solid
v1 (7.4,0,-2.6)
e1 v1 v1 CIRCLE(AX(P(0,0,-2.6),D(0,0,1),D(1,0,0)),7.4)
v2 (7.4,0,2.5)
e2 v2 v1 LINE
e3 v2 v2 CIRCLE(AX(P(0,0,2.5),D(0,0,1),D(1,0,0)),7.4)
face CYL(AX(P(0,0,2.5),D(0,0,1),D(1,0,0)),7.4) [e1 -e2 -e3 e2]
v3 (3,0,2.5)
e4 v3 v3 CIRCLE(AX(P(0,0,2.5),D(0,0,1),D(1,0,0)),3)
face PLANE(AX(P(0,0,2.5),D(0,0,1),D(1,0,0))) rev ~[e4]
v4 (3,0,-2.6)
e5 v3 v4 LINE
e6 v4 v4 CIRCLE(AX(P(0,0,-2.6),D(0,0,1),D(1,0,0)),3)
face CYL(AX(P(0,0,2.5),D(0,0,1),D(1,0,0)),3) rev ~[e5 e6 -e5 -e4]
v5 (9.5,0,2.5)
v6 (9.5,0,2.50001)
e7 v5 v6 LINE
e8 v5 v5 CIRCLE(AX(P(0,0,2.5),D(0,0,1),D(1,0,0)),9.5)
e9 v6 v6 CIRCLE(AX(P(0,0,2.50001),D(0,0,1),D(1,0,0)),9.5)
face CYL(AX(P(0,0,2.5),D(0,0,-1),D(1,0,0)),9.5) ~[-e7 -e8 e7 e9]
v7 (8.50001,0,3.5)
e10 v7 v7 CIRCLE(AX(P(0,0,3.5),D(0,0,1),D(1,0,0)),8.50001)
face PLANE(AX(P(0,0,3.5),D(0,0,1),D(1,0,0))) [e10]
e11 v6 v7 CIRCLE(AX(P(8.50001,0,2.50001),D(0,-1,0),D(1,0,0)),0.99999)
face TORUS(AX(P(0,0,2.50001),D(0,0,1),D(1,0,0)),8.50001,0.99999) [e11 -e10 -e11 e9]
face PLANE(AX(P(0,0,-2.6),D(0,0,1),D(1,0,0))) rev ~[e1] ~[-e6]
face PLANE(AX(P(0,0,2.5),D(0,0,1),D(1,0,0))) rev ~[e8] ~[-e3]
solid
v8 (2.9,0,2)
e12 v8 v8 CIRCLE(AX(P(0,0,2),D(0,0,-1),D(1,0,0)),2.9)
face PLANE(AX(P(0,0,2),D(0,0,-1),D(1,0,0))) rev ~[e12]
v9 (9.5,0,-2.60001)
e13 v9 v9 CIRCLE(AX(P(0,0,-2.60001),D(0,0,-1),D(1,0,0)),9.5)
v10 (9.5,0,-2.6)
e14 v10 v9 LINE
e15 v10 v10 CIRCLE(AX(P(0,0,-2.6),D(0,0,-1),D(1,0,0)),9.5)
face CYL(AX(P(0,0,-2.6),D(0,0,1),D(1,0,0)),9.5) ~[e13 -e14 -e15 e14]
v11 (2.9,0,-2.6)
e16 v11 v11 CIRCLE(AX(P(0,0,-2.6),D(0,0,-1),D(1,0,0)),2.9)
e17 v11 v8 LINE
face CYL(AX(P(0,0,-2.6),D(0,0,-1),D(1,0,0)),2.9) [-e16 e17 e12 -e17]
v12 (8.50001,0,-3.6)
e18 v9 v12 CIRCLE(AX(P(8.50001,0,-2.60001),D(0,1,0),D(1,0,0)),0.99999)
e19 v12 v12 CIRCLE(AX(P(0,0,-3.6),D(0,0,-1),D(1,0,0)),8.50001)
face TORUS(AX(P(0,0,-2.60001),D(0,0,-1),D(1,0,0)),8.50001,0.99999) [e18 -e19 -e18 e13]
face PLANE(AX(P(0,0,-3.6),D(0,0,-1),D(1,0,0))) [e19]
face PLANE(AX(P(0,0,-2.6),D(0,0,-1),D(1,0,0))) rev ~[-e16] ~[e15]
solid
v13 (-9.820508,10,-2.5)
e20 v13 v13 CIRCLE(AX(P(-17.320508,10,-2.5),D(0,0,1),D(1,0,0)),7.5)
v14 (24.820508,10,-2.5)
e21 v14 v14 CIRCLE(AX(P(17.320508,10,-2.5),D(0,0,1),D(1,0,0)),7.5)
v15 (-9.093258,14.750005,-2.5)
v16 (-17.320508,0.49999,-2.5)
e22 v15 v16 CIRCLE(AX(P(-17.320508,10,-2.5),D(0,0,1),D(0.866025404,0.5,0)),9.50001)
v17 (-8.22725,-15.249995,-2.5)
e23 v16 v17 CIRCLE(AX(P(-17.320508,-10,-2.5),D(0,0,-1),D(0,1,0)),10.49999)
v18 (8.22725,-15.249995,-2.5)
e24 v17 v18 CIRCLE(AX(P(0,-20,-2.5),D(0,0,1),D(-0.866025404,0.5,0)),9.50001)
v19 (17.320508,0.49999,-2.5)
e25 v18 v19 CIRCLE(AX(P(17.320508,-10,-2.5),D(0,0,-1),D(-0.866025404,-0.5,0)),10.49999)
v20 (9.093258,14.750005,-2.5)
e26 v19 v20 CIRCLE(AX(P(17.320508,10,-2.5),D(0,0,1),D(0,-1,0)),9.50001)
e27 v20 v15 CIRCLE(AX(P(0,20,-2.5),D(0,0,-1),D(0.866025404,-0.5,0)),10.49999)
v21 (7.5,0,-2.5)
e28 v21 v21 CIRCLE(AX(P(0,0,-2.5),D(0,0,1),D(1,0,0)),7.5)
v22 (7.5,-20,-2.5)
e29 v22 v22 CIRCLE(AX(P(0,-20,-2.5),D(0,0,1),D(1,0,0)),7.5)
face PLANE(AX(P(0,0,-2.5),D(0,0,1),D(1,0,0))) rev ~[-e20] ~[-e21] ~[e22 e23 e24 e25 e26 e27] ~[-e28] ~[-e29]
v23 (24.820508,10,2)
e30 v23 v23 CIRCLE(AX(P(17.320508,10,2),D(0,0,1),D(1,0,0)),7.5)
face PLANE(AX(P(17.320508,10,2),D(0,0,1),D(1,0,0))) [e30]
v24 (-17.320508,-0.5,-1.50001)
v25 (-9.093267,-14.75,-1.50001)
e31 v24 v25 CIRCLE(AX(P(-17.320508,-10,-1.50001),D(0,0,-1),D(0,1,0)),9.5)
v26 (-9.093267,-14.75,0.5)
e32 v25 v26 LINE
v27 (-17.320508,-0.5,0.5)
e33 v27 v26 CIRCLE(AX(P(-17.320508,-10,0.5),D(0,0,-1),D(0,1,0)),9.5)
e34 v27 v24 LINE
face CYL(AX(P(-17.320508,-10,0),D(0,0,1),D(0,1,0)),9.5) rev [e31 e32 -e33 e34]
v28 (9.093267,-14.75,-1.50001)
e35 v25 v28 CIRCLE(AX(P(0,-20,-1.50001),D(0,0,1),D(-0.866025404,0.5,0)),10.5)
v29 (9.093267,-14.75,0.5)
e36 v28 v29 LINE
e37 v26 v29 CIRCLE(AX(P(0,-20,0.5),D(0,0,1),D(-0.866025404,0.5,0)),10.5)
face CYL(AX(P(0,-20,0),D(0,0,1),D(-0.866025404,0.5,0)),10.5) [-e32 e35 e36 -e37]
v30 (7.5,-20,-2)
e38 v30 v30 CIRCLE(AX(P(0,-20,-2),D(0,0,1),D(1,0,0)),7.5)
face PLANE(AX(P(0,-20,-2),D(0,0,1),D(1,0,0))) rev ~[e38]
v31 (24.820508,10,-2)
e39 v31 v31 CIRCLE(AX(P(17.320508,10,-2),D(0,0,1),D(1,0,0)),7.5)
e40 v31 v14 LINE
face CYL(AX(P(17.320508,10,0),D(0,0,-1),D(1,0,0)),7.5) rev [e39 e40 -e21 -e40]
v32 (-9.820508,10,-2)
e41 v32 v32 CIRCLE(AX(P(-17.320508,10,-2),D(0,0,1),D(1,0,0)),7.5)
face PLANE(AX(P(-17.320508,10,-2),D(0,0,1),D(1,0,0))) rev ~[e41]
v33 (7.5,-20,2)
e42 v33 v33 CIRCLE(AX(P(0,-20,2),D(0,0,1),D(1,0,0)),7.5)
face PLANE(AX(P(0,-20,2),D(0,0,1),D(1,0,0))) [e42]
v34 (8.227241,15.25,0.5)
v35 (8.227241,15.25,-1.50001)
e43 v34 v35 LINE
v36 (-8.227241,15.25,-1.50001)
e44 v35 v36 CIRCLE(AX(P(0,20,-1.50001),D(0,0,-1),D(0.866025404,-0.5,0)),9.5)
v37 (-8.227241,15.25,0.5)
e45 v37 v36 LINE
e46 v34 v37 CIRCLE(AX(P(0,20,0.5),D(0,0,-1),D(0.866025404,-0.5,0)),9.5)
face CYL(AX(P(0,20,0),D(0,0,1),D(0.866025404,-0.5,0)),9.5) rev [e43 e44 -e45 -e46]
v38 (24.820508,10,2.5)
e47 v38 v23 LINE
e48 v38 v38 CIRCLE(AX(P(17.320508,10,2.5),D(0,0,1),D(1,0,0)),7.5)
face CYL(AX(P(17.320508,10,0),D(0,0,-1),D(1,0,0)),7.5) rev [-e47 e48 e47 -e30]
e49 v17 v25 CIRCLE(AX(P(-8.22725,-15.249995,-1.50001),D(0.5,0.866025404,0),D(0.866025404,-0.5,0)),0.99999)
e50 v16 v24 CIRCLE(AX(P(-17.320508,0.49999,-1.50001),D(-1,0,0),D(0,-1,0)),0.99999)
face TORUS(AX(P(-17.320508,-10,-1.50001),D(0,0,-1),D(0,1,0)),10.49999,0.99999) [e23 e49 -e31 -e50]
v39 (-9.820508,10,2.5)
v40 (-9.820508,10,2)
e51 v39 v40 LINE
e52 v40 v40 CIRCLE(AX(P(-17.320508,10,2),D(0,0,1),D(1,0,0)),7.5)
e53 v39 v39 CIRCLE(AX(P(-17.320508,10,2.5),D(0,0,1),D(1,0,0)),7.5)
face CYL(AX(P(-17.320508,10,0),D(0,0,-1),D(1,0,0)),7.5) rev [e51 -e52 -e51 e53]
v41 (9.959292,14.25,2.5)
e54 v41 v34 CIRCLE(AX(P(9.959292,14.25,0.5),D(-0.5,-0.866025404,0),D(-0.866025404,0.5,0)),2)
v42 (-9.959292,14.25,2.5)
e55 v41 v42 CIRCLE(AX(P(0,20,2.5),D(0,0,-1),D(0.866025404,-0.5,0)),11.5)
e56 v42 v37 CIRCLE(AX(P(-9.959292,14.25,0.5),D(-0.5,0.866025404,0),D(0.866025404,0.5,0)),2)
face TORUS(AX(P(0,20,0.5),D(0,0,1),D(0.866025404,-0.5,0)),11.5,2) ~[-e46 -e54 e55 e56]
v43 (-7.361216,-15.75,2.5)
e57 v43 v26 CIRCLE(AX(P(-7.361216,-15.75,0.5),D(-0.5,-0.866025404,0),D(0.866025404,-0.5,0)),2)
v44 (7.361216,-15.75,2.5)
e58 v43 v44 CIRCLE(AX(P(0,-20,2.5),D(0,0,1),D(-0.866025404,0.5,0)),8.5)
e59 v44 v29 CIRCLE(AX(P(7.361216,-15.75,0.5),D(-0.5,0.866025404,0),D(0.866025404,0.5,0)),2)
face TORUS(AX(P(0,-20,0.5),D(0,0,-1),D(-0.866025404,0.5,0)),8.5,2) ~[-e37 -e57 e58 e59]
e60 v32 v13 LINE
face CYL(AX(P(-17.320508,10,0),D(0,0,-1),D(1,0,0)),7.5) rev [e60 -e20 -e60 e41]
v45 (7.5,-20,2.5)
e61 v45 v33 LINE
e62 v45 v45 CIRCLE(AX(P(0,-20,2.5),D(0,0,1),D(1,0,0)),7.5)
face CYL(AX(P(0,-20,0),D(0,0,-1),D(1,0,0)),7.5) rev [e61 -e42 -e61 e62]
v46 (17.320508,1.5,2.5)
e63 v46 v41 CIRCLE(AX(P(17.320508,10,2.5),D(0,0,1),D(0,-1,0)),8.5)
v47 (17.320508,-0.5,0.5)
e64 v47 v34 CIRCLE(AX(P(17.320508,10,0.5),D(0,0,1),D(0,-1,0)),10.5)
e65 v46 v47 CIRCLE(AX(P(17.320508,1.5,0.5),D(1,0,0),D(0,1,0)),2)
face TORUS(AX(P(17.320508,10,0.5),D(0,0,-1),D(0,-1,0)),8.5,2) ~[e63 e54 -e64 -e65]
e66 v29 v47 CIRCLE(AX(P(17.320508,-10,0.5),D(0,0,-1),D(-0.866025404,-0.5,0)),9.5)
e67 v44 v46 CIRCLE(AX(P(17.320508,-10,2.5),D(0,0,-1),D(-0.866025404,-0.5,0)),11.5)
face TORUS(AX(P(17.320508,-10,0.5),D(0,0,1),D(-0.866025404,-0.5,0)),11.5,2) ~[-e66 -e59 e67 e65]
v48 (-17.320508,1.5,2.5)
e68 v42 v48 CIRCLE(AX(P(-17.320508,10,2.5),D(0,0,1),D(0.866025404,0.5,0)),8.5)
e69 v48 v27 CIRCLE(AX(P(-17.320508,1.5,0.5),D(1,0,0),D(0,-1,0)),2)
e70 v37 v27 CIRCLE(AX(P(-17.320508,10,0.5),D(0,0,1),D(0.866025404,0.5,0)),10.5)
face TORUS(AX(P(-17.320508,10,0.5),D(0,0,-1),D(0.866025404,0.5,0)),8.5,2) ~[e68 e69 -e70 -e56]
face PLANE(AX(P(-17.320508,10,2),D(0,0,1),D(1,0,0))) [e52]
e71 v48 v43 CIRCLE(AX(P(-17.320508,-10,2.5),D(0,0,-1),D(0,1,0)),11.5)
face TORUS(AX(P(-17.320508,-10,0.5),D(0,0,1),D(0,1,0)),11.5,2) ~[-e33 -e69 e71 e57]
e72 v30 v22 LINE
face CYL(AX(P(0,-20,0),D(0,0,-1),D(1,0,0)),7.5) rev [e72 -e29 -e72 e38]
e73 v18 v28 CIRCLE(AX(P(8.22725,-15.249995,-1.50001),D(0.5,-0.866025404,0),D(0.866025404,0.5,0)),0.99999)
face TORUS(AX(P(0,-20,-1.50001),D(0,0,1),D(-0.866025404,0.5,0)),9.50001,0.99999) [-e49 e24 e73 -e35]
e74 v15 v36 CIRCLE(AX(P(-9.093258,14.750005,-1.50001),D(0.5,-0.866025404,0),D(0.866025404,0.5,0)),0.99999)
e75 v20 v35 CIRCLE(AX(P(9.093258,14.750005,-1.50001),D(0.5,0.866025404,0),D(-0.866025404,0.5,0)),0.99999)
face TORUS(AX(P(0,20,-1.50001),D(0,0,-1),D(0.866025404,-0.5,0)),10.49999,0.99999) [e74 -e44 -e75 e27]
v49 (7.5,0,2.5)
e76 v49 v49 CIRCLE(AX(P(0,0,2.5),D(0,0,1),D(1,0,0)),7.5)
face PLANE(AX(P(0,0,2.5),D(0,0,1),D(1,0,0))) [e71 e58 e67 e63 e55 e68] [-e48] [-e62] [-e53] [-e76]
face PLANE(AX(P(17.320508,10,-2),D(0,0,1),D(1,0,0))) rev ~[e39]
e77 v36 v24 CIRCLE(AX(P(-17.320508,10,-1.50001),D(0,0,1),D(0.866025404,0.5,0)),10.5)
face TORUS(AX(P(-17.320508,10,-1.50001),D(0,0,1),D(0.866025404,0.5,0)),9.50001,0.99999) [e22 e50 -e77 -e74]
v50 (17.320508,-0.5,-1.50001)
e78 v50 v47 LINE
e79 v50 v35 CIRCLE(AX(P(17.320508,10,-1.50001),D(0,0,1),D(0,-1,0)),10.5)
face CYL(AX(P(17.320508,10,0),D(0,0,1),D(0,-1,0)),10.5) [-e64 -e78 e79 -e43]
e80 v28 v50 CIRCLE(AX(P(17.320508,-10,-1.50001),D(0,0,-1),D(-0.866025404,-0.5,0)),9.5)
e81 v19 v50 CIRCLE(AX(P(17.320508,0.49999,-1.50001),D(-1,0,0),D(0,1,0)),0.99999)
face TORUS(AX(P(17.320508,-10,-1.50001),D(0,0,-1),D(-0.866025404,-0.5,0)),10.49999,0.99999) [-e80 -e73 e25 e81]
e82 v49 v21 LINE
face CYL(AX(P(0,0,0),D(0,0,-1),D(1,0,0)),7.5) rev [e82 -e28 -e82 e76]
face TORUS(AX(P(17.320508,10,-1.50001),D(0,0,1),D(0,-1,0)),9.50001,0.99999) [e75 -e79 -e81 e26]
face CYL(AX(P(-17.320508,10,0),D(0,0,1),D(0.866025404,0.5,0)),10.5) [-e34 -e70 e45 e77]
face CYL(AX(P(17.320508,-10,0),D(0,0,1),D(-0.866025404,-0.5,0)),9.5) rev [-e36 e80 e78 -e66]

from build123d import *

# Parameters (mm, degrees)
F0_R     = 7.5
F1_DEPTH = 2.5
F2_DEPTH = 2
F3_R     = 7.4
F3_R_2   = 3
F4_DEPTH = 5.1
F3_R_3   = 9.5
F5_DEPTH = 1
F6_R     = 2.9
F7_DEPTH = 4.6
F6_R_2   = 9.5
F6_R_3   = 7.4
F6_R_4   = 3
F8_DEPTH = 1
F9_R     = 2
F10_R    = 0.99999
F11_R    = 0.99999
F11_2_R  = 0.99999


# Not quite as in the source:
# - a fillet or chamfer is up to 0.001 mm smaller than in the source, because OpenCascade refuses the exact size


with BuildPart() as f1:
    # F0 (on Top) → F1 (new body, symmetric)
    with BuildSketch(Plane.XY):
        with BuildLine():
            ThreePointArc((-17.3205080757, -0.5), (-9.0932667397, -5.25), (-9.0932667397, -14.75))
            ThreePointArc((-9.0932667397, -14.75), (0, -30.5), (9.0932667397, -14.75))
            ThreePointArc((9.0932667397, -14.75), (9.0932667397, -5.25), (17.3205080757, -0.5))
            ThreePointArc((17.3205080757, -0.5), (26.4137748154, 15.25), (8.227241336, 15.25))
            ThreePointArc((8.227241336, 15.25), (0, 10.5), (-8.227241336, 15.25))
            ThreePointArc((-8.227241336, 15.25), (-26.4137748154, 15.25), (-17.3205080757, -0.5))
        make_face()
        with Locations((0, -20)):
            Circle(F0_R, mode=Mode.SUBTRACT)
        with Locations((-17.3205080757, 10)):
            Circle(F0_R, mode=Mode.SUBTRACT)
        Circle(F0_R, mode=Mode.SUBTRACT)
        with Locations((17.3205080757, 10)):
            Circle(F0_R, mode=Mode.SUBTRACT)
    extrude(amount=F1_DEPTH, both=True)

    # F0 (on Top) → F2 (join, symmetric)
    with BuildSketch(Plane.XY):
        with Locations((0, -20)):
            Circle(F0_R)
        with Locations((17.3205080757, 10)):
            Circle(F0_R)
        with Locations((-17.3205080757, 10)):
            Circle(F0_R)
    extrude(amount=F2_DEPTH, both=True)

    # F9
    f9_edges = [f1.edges().sort_by_distance(p)[0] for p in [
        (-26.413775, 15.25, 2.5),
        (-9.093267, -5.25, 2.5),
        (0, -30.5, 2.5),
        (9.093267, -5.25, 2.5),
        (26.413775, 15.25, 2.5),
        (0, 10.5, 2.5),
    ]]
    fillet(f9_edges, radius=F9_R)

    # F11 (radius 1 in the source; OpenCascade refuses exactly that, so slightly less here)
    f11_edges = [f1.edges().sort_by_distance(p)[0] for p in [
        (-26.413775, 15.25, -2.5),
        (-9.093267, -5.25, -2.5),
        (0, -30.5, -2.5),
        (9.093267, -5.25, -2.5),
        (26.413775, 15.25, -2.5),
        (0, 10.5, -2.5),
    ]]
    fillet(f11_edges, radius=F11_R)


with BuildPart() as f4:
    # F3 (on face) → F4 (new body)
    with BuildSketch(Plane.XY.offset(2.5)):
        Circle(F3_R)
        Circle(F3_R_2, mode=Mode.SUBTRACT)
    extrude(amount=-F4_DEPTH)

    # F3 (on face) → F5 (join)
    with BuildSketch(Plane.XY.offset(2.5)):
        Circle(F3_R_3)
        Circle(F3_R, mode=Mode.SUBTRACT)
        Circle(F3_R)
        Circle(F3_R_2, mode=Mode.SUBTRACT)
        Circle(F3_R_2)
    extrude(amount=F5_DEPTH)

    # F10 (radius 1 in the source; OpenCascade refuses exactly that, so slightly less here)
    f10_edges = [f4.edges().sort_by_distance(p)[0] for p in [
        (-9.5, 0, 3.5),
    ]]
    fillet(f10_edges, radius=F10_R)


with BuildPart() as f7:
    # F6 (on face) → F7 (new body, through all)
    with BuildSketch(Plane(origin=(0, 0, -2.6), x_dir=(1, 0, 0), z_dir=(0, 0, -1))):
        Circle(F6_R)
    extrude(amount=-F7_DEPTH)

    # F6 (on face) → F8 (join)
    with BuildSketch(Plane(origin=(0, 0, -2.6), x_dir=(1, 0, 0), z_dir=(0, 0, -1))):
        Circle(F6_R_2)
        Circle(F6_R_3, mode=Mode.SUBTRACT)
        Circle(F6_R_3)
        Circle(F6_R_4, mode=Mode.SUBTRACT)
        Circle(F6_R_4)
        Circle(F6_R, mode=Mode.SUBTRACT)
        Circle(F6_R)
    extrude(amount=F8_DEPTH)

    # F11#2 (radius 1 in the source; OpenCascade refuses exactly that, so slightly less here)
    f11_2_edges = [f7.edges().sort_by_distance(p)[0] for p in [
        (-9.5, 0, -3.6),
    ]]
    fillet(f11_2_edges, radius=F11_2_R)


solid = Compound([f1.part, f4.part, f7.part])
